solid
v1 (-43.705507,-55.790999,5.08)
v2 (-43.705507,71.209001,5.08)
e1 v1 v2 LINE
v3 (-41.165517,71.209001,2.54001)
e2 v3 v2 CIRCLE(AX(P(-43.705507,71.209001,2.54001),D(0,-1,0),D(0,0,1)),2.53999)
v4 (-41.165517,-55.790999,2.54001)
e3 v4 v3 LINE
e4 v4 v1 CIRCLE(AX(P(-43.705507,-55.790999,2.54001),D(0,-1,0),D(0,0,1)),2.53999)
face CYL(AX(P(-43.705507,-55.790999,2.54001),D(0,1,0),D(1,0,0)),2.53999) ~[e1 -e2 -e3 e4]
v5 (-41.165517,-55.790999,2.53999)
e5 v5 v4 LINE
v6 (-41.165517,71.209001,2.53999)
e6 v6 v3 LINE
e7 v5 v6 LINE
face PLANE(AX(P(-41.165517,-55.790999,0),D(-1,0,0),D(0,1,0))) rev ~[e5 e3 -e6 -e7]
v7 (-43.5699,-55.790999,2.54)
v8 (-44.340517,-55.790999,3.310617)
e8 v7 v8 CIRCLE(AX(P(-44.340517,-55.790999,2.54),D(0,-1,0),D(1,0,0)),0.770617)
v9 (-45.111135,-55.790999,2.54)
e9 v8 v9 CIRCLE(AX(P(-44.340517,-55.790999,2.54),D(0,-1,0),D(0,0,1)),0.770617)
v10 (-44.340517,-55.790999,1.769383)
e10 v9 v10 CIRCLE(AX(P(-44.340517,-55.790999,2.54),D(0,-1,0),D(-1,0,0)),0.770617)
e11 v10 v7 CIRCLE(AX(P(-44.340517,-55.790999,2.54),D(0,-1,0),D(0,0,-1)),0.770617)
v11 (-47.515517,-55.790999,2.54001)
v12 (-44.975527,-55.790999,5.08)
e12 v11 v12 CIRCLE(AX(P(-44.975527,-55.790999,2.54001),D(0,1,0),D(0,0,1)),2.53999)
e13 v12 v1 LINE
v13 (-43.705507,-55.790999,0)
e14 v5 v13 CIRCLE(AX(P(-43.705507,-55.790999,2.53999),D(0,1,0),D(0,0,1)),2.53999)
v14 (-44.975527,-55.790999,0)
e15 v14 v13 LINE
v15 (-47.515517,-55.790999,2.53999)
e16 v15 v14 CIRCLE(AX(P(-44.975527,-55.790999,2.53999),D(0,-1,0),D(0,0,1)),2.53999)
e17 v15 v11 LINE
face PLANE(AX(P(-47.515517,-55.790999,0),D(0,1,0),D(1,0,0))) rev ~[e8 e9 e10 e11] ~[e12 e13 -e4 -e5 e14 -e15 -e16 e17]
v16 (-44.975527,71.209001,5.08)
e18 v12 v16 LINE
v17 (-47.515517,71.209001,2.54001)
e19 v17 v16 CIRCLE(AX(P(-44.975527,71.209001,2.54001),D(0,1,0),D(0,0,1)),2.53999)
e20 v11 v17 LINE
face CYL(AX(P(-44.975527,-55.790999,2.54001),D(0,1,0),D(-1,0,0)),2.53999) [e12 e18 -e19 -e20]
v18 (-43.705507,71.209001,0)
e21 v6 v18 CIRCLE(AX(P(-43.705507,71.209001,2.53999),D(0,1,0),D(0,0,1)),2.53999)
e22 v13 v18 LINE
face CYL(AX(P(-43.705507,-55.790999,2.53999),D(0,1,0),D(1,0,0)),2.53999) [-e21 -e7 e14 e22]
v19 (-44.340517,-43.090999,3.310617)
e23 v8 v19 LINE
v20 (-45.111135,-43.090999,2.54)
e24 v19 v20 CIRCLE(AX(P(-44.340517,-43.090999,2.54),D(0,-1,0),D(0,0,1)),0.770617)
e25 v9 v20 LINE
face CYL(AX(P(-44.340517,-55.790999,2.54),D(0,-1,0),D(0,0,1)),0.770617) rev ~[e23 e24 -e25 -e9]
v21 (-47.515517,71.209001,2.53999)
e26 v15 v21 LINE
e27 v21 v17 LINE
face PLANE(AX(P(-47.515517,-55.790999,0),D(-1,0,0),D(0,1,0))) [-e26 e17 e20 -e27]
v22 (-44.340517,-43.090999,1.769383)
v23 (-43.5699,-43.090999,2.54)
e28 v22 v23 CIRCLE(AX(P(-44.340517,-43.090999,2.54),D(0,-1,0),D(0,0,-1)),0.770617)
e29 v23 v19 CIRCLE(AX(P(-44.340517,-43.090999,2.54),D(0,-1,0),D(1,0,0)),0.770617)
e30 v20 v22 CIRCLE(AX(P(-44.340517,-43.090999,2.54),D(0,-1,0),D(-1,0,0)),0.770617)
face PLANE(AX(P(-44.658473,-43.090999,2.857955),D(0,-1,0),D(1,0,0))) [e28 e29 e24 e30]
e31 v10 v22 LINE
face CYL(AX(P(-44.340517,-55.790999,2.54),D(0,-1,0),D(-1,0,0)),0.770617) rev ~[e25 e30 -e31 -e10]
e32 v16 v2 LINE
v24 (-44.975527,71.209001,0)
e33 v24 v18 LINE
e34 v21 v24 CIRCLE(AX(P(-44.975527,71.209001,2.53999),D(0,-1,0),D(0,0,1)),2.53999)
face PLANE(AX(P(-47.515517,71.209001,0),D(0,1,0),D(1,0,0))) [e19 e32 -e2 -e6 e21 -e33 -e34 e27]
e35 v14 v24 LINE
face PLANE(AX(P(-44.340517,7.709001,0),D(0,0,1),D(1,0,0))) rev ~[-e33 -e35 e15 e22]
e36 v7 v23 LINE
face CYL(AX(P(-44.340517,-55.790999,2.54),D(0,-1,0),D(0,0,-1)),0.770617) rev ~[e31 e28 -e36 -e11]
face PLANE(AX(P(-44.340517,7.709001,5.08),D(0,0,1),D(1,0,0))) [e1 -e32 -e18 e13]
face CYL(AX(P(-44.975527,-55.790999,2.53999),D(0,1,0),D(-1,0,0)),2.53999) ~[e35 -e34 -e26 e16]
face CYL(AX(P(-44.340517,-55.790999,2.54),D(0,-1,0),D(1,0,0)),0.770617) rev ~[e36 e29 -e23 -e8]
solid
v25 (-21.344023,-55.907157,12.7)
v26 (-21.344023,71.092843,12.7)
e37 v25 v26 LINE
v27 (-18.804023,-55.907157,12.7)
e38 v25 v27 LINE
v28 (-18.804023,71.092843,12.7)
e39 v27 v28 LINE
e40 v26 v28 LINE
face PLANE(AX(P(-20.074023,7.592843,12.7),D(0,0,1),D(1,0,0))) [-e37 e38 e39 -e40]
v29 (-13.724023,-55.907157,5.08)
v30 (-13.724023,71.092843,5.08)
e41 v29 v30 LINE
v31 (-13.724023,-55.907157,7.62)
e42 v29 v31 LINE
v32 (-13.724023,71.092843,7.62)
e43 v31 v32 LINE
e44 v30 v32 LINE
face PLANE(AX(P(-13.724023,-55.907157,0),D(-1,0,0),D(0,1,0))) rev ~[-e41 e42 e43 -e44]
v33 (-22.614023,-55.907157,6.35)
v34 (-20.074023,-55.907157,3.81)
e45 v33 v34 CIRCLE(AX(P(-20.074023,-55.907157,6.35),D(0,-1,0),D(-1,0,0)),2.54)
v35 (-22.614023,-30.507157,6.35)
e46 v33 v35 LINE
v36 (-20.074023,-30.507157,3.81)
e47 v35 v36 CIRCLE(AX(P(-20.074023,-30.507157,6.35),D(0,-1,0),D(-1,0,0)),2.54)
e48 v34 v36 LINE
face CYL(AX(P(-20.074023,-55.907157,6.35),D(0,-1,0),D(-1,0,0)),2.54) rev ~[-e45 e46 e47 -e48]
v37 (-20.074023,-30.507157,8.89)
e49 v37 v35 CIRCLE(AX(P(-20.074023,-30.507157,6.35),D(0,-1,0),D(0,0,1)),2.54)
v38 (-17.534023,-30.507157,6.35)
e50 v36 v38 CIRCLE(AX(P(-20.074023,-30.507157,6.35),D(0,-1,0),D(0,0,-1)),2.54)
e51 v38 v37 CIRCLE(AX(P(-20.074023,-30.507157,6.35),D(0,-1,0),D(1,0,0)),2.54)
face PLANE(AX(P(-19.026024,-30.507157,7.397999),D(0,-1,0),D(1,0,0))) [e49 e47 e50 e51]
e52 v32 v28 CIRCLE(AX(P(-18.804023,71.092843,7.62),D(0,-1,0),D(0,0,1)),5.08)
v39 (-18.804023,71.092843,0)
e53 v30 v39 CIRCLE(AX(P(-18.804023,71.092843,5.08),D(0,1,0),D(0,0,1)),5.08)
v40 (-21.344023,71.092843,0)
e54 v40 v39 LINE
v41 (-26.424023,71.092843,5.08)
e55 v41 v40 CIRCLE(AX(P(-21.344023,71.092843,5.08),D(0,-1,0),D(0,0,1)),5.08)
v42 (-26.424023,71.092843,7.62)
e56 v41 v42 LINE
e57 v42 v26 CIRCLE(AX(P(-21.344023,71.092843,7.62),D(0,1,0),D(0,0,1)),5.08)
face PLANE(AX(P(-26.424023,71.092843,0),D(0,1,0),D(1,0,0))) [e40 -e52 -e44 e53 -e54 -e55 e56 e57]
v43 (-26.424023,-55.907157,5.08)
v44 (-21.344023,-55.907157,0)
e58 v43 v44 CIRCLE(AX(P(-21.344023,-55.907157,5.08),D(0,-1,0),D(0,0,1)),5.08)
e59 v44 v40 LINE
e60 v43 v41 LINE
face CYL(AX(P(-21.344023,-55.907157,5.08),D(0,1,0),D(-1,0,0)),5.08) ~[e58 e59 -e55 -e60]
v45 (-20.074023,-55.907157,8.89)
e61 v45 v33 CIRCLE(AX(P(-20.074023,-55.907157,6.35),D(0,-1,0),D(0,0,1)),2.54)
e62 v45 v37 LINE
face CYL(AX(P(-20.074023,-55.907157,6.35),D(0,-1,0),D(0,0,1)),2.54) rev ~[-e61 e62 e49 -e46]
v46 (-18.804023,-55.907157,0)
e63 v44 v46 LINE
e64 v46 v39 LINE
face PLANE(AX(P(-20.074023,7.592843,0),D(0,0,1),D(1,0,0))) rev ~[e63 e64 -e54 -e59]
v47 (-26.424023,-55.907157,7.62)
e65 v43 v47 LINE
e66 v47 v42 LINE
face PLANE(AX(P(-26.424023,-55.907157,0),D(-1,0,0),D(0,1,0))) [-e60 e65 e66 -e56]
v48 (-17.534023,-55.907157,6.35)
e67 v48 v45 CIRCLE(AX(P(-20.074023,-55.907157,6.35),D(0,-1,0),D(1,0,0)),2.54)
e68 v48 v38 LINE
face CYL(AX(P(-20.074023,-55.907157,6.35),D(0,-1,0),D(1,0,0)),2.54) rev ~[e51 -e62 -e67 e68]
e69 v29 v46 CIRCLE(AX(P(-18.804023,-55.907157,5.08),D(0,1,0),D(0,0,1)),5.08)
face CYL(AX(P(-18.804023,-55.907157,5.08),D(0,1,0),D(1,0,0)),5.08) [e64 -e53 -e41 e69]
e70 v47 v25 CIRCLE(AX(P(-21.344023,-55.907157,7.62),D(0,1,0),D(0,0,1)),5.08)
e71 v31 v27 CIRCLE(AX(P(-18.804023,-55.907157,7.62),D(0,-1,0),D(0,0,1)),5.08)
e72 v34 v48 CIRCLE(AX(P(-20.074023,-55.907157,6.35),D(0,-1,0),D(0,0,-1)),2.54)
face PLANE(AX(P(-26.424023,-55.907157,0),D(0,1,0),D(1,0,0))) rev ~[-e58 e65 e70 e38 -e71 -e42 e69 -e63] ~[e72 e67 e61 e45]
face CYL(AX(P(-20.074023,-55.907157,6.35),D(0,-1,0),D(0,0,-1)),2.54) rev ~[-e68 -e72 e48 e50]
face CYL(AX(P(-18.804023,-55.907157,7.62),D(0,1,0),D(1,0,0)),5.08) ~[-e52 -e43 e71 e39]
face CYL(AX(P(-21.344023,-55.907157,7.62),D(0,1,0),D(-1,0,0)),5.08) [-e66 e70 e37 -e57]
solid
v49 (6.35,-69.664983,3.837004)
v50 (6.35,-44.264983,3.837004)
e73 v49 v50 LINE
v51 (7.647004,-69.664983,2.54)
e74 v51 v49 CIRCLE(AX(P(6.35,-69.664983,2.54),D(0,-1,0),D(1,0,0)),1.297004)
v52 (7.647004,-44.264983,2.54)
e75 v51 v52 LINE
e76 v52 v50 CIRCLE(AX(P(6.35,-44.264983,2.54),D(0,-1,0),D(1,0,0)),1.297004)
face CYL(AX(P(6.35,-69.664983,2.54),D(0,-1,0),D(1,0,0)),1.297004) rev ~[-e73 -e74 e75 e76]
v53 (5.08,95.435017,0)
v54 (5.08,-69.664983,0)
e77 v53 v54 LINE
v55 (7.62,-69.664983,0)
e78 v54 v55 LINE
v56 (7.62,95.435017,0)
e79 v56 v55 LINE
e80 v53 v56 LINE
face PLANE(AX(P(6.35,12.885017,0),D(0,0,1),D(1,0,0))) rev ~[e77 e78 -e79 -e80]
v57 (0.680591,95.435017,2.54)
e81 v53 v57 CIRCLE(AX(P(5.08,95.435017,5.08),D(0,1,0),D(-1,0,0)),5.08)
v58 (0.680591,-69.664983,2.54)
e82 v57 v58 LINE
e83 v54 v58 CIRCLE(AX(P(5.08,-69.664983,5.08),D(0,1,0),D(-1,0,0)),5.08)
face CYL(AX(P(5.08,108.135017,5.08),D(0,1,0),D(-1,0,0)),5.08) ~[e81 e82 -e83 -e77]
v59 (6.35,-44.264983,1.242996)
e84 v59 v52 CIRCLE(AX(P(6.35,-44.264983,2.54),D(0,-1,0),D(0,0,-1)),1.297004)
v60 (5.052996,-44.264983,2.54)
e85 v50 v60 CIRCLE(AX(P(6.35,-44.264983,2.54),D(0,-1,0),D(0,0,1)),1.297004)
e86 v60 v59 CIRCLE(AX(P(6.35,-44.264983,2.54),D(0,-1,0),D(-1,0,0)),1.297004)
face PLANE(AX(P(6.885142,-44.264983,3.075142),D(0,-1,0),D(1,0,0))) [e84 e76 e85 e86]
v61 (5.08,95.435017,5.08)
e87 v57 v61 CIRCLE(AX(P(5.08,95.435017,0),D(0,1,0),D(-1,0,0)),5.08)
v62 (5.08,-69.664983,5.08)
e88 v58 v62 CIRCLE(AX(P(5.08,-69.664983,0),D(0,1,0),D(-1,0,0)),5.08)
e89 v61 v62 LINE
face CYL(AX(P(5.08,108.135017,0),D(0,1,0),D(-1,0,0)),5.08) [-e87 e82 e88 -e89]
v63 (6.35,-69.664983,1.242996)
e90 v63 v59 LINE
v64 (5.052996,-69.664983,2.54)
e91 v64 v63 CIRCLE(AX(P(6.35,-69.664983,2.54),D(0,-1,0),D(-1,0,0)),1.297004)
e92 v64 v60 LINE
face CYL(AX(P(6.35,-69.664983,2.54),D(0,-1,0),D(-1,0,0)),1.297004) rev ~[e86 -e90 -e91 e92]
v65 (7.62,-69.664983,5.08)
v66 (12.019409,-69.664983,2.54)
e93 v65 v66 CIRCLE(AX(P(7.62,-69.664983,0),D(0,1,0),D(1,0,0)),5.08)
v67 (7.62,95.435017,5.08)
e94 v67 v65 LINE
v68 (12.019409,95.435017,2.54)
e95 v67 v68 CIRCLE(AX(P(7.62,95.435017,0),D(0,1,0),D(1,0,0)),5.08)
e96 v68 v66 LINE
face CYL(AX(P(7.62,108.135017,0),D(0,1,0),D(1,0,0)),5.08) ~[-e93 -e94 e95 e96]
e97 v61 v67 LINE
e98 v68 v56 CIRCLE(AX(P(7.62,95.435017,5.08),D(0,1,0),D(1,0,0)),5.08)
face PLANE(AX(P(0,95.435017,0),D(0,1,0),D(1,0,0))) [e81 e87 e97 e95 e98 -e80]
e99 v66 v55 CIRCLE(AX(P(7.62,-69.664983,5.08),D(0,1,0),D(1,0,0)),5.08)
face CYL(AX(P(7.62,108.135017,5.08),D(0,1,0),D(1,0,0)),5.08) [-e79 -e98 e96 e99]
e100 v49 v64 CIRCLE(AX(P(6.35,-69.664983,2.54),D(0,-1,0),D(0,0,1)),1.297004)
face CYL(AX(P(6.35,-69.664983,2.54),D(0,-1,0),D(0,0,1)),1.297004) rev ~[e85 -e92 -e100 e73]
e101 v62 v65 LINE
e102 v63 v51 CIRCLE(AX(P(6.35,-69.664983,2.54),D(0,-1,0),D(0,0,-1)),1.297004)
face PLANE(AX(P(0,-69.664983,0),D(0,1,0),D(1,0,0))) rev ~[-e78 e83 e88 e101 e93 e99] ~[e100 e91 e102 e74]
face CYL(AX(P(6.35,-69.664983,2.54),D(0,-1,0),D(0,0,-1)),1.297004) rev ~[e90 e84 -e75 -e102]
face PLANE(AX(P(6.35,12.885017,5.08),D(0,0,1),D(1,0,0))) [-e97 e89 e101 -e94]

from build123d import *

# Parameters (mm, degrees)
F0_W         = 6.35
F0_H         = 127
F1_DEPTH     = 5.08
F2_R         = 2.53999
F4_DEPTH     = 12.7
F5_W         = 12.7
F5_H         = 127
F6_DEPTH     = 12.7
F7_R         = 5.08
F9_DEPTH     = 25.4
F10_W        = 12.7
F10_H        = 165.1
F11_DEPTH    = 5.08
F12_T1_DEPTH = 190.5
F14_DEPTH    = 25.4


# Not quite as in the source:
# - a fillet or chamfer that OpenCascade refuses, or shapes differently, is made with other operations: its cross-section is extruded or revolved along the edge and cut away or added
# - a fillet or chamfer is up to 0.001 mm smaller than in the source, because OpenCascade refuses the exact size


with BuildPart() as f1:
    # F0 (on Top) → F1 (new body)
    with BuildSketch(Plane.XY):
        with Locations((-44.3405173719, 7.7090010995)):
            Rectangle(F0_W, F0_H)
    extrude(amount=F1_DEPTH)

    # F2 (radius 2.54 in the source; OpenCascade refuses exactly that, so slightly less here)
    f2_edges = [f1.edges().sort_by_distance(p)[0] for p in [
        (-47.515517, 7.709001, 5.08),
        (-41.165517, 7.709001, 5.08),
        (-41.165517, 7.709001, 0),
        (-47.515517, 7.709001, 0),
    ]]
    fillet(f2_edges, radius=F2_R)

    # F3 (on face) → F4 (cut)
    with BuildSketch(Plane.XZ.offset(55.7909989005)):
        with BuildLine():
            Line((-45.1111345742, 2.54), (-44.3405173719, 2.54))
            Line((-44.3405173719, 2.54), (-44.3405173719, 3.3106172023))
            ThreePointArc((-44.3405173719, 3.3106172023), (-44.8854260214, 3.0849086495), (-45.1111345742, 2.54))
        make_face()
        with BuildLine():
            Line((-44.3405173719, 2.54), (-43.5699001695, 2.54))
            ThreePointArc((-43.5699001695, 2.54), (-43.7956087224, 3.0849086495), (-44.3405173719, 3.3106172023))
            Line((-44.3405173719, 3.3106172023), (-44.3405173719, 2.54))
        make_face()
        with BuildLine():
            ThreePointArc((-44.3405173719, 1.7693827977), (-43.7956087224, 1.9950913505), (-43.5699001695, 2.54))
            Line((-43.5699001695, 2.54), (-44.3405173719, 2.54))
            Line((-44.3405173719, 2.54), (-44.3405173719, 1.7693827977))
        make_face()
        with BuildLine():
            Line((-44.3405173719, 1.7693827977), (-44.3405173719, 2.54))
            Line((-44.3405173719, 2.54), (-45.1111345742, 2.54))
            ThreePointArc((-45.1111345742, 2.54), (-44.8854260214, 1.9950913505), (-44.3405173719, 1.7693827977))
        make_face()
    extrude(amount=-F4_DEPTH, mode=Mode.SUBTRACT)


with BuildPart() as f6:
    # F5 (on Top) → F6 (new body)
    with BuildSketch(Plane.XY):
        with Locations((-20.0740229338, 7.5928430158)):
            Rectangle(F5_W, F5_H)
    extrude(amount=F6_DEPTH)

    # F7
    f7_edges = [f6.edges().sort_by_distance(p)[0] for p in [
        (-26.424023, 7.592843, 12.7),
        (-13.724023, 7.592843, 12.7),
        (-13.724023, 7.592843, 0),
        (-26.424023, 7.592843, 0),
    ]]
    fillet(f7_edges, radius=F7_R)

    # F8 (on face) → F9 (cut)
    with BuildSketch(Plane.XZ.offset(55.9071569842)):
        with BuildLine():
            ThreePointArc((-17.5340229338, 6.35), (-18.2779717096, 8.1460512242), (-20.0740229338, 8.89))
            Line((-20.0740229338, 8.89), (-20.0740229338, 6.35))
            Line((-20.0740229338, 6.35), (-17.5340229338, 6.35))
        make_face()
        with BuildLine():
            Line((-20.0740229338, 6.35), (-20.0740229338, 8.89))
            ThreePointArc((-20.0740229338, 8.89), (-21.8700741581, 8.1460512242), (-22.6140229338, 6.35))
            Line((-22.6140229338, 6.35), (-20.0740229338, 6.35))
        make_face()
        with BuildLine():
            Line((-20.0740229338, 3.81), (-20.0740229338, 6.35))
            Line((-20.0740229338, 6.35), (-22.6140229338, 6.35))
            ThreePointArc((-22.6140229338, 6.35), (-21.8700741581, 4.5539487758), (-20.0740229338, 3.81))
        make_face()
        with BuildLine():
            Line((-17.5340229338, 6.35), (-20.0740229338, 6.35))
            Line((-20.0740229338, 6.35), (-20.0740229338, 3.81))
            ThreePointArc((-20.0740229338, 3.81), (-18.2779717096, 4.5539487758), (-17.5340229338, 6.35))
        make_face()
    extrude(amount=-F9_DEPTH, mode=Mode.SUBTRACT)


with BuildPart() as f11:
    # F10 (on Top) → F11 (new body)
    with BuildSketch(Plane.XY):
        with Locations((6.35, 12.8850169986)):
            Rectangle(F10_W, F10_H)
    extrude(amount=F11_DEPTH)

    # F12: fillet of radius 5.08 on 4 edges, made by hand

    # F12_s2 → F12_t1 (cut)
    with BuildSketch(Plane.XZ.offset(-108.1350169986)):
        with BuildLine():
            ThreePointArc((12.7, 0), (11.2121024484, 3.5921024484), (7.62, 5.08))
            Line((7.62, 5.08), (12.7, 5.08))
            Line((12.7, 5.08), (12.7, 0))
        make_face()
        with BuildLine():
            ThreePointArc((0, 0), (1.4878975516, 3.5921024484), (5.08, 5.08))
            Line((5.08, 5.08), (0, 5.08))
            Line((0, 5.08), (0, 0))
        make_face()
        with BuildLine():
            ThreePointArc((12.7, 5.08), (11.2121024484, 1.4878975516), (7.62, 0))
            Line((7.62, 0), (12.7, 0))
            Line((12.7, 0), (12.7, 5.08))
        make_face()
        with BuildLine():
            ThreePointArc((0, 5.08), (1.4878975516, 1.4878975516), (5.08, 0))
            Line((5.08, 0), (0, 0))
            Line((0, 0), (0, 5.08))
        make_face()
    extrude(amount=F12_T1_DEPTH, mode=Mode.SUBTRACT)

    # F13 (on face) → F14 (cut)
    with BuildSketch(Plane.XZ.offset(69.6649830014)):
        with BuildLine():
            ThreePointArc((7.6470044609, 2.54), (7.2671206496, 3.4571206496), (6.35, 3.8370044609))
            Line((6.35, 3.8370044609), (6.35, 2.54))
            Line((6.35, 2.54), (7.6470044609, 2.54))
        make_face()
        with BuildLine():
            Line((6.35, 2.54), (6.35, 3.8370044609))
            ThreePointArc((6.35, 3.8370044609), (5.4328793504, 3.4571206496), (5.0529955391, 2.54))
            Line((5.0529955391, 2.54), (6.35, 2.54))
        make_face()
        with BuildLine():
            Line((6.35, 1.2429955391), (6.35, 2.54))
            Line((6.35, 2.54), (5.0529955391, 2.54))
            ThreePointArc((5.0529955391, 2.54), (5.4328793504, 1.6228793504), (6.35, 1.2429955391))
        make_face()
        with BuildLine():
            Line((7.6470044609, 2.54), (6.35, 2.54))
            Line((6.35, 2.54), (6.35, 1.2429955391))
            ThreePointArc((6.35, 1.2429955391), (7.2671206496, 1.6228793504), (7.6470044609, 2.54))
        make_face()
    extrude(amount=-F14_DEPTH, mode=Mode.SUBTRACT)


solid = Compound([f1.part, f6.part, f11.part])
